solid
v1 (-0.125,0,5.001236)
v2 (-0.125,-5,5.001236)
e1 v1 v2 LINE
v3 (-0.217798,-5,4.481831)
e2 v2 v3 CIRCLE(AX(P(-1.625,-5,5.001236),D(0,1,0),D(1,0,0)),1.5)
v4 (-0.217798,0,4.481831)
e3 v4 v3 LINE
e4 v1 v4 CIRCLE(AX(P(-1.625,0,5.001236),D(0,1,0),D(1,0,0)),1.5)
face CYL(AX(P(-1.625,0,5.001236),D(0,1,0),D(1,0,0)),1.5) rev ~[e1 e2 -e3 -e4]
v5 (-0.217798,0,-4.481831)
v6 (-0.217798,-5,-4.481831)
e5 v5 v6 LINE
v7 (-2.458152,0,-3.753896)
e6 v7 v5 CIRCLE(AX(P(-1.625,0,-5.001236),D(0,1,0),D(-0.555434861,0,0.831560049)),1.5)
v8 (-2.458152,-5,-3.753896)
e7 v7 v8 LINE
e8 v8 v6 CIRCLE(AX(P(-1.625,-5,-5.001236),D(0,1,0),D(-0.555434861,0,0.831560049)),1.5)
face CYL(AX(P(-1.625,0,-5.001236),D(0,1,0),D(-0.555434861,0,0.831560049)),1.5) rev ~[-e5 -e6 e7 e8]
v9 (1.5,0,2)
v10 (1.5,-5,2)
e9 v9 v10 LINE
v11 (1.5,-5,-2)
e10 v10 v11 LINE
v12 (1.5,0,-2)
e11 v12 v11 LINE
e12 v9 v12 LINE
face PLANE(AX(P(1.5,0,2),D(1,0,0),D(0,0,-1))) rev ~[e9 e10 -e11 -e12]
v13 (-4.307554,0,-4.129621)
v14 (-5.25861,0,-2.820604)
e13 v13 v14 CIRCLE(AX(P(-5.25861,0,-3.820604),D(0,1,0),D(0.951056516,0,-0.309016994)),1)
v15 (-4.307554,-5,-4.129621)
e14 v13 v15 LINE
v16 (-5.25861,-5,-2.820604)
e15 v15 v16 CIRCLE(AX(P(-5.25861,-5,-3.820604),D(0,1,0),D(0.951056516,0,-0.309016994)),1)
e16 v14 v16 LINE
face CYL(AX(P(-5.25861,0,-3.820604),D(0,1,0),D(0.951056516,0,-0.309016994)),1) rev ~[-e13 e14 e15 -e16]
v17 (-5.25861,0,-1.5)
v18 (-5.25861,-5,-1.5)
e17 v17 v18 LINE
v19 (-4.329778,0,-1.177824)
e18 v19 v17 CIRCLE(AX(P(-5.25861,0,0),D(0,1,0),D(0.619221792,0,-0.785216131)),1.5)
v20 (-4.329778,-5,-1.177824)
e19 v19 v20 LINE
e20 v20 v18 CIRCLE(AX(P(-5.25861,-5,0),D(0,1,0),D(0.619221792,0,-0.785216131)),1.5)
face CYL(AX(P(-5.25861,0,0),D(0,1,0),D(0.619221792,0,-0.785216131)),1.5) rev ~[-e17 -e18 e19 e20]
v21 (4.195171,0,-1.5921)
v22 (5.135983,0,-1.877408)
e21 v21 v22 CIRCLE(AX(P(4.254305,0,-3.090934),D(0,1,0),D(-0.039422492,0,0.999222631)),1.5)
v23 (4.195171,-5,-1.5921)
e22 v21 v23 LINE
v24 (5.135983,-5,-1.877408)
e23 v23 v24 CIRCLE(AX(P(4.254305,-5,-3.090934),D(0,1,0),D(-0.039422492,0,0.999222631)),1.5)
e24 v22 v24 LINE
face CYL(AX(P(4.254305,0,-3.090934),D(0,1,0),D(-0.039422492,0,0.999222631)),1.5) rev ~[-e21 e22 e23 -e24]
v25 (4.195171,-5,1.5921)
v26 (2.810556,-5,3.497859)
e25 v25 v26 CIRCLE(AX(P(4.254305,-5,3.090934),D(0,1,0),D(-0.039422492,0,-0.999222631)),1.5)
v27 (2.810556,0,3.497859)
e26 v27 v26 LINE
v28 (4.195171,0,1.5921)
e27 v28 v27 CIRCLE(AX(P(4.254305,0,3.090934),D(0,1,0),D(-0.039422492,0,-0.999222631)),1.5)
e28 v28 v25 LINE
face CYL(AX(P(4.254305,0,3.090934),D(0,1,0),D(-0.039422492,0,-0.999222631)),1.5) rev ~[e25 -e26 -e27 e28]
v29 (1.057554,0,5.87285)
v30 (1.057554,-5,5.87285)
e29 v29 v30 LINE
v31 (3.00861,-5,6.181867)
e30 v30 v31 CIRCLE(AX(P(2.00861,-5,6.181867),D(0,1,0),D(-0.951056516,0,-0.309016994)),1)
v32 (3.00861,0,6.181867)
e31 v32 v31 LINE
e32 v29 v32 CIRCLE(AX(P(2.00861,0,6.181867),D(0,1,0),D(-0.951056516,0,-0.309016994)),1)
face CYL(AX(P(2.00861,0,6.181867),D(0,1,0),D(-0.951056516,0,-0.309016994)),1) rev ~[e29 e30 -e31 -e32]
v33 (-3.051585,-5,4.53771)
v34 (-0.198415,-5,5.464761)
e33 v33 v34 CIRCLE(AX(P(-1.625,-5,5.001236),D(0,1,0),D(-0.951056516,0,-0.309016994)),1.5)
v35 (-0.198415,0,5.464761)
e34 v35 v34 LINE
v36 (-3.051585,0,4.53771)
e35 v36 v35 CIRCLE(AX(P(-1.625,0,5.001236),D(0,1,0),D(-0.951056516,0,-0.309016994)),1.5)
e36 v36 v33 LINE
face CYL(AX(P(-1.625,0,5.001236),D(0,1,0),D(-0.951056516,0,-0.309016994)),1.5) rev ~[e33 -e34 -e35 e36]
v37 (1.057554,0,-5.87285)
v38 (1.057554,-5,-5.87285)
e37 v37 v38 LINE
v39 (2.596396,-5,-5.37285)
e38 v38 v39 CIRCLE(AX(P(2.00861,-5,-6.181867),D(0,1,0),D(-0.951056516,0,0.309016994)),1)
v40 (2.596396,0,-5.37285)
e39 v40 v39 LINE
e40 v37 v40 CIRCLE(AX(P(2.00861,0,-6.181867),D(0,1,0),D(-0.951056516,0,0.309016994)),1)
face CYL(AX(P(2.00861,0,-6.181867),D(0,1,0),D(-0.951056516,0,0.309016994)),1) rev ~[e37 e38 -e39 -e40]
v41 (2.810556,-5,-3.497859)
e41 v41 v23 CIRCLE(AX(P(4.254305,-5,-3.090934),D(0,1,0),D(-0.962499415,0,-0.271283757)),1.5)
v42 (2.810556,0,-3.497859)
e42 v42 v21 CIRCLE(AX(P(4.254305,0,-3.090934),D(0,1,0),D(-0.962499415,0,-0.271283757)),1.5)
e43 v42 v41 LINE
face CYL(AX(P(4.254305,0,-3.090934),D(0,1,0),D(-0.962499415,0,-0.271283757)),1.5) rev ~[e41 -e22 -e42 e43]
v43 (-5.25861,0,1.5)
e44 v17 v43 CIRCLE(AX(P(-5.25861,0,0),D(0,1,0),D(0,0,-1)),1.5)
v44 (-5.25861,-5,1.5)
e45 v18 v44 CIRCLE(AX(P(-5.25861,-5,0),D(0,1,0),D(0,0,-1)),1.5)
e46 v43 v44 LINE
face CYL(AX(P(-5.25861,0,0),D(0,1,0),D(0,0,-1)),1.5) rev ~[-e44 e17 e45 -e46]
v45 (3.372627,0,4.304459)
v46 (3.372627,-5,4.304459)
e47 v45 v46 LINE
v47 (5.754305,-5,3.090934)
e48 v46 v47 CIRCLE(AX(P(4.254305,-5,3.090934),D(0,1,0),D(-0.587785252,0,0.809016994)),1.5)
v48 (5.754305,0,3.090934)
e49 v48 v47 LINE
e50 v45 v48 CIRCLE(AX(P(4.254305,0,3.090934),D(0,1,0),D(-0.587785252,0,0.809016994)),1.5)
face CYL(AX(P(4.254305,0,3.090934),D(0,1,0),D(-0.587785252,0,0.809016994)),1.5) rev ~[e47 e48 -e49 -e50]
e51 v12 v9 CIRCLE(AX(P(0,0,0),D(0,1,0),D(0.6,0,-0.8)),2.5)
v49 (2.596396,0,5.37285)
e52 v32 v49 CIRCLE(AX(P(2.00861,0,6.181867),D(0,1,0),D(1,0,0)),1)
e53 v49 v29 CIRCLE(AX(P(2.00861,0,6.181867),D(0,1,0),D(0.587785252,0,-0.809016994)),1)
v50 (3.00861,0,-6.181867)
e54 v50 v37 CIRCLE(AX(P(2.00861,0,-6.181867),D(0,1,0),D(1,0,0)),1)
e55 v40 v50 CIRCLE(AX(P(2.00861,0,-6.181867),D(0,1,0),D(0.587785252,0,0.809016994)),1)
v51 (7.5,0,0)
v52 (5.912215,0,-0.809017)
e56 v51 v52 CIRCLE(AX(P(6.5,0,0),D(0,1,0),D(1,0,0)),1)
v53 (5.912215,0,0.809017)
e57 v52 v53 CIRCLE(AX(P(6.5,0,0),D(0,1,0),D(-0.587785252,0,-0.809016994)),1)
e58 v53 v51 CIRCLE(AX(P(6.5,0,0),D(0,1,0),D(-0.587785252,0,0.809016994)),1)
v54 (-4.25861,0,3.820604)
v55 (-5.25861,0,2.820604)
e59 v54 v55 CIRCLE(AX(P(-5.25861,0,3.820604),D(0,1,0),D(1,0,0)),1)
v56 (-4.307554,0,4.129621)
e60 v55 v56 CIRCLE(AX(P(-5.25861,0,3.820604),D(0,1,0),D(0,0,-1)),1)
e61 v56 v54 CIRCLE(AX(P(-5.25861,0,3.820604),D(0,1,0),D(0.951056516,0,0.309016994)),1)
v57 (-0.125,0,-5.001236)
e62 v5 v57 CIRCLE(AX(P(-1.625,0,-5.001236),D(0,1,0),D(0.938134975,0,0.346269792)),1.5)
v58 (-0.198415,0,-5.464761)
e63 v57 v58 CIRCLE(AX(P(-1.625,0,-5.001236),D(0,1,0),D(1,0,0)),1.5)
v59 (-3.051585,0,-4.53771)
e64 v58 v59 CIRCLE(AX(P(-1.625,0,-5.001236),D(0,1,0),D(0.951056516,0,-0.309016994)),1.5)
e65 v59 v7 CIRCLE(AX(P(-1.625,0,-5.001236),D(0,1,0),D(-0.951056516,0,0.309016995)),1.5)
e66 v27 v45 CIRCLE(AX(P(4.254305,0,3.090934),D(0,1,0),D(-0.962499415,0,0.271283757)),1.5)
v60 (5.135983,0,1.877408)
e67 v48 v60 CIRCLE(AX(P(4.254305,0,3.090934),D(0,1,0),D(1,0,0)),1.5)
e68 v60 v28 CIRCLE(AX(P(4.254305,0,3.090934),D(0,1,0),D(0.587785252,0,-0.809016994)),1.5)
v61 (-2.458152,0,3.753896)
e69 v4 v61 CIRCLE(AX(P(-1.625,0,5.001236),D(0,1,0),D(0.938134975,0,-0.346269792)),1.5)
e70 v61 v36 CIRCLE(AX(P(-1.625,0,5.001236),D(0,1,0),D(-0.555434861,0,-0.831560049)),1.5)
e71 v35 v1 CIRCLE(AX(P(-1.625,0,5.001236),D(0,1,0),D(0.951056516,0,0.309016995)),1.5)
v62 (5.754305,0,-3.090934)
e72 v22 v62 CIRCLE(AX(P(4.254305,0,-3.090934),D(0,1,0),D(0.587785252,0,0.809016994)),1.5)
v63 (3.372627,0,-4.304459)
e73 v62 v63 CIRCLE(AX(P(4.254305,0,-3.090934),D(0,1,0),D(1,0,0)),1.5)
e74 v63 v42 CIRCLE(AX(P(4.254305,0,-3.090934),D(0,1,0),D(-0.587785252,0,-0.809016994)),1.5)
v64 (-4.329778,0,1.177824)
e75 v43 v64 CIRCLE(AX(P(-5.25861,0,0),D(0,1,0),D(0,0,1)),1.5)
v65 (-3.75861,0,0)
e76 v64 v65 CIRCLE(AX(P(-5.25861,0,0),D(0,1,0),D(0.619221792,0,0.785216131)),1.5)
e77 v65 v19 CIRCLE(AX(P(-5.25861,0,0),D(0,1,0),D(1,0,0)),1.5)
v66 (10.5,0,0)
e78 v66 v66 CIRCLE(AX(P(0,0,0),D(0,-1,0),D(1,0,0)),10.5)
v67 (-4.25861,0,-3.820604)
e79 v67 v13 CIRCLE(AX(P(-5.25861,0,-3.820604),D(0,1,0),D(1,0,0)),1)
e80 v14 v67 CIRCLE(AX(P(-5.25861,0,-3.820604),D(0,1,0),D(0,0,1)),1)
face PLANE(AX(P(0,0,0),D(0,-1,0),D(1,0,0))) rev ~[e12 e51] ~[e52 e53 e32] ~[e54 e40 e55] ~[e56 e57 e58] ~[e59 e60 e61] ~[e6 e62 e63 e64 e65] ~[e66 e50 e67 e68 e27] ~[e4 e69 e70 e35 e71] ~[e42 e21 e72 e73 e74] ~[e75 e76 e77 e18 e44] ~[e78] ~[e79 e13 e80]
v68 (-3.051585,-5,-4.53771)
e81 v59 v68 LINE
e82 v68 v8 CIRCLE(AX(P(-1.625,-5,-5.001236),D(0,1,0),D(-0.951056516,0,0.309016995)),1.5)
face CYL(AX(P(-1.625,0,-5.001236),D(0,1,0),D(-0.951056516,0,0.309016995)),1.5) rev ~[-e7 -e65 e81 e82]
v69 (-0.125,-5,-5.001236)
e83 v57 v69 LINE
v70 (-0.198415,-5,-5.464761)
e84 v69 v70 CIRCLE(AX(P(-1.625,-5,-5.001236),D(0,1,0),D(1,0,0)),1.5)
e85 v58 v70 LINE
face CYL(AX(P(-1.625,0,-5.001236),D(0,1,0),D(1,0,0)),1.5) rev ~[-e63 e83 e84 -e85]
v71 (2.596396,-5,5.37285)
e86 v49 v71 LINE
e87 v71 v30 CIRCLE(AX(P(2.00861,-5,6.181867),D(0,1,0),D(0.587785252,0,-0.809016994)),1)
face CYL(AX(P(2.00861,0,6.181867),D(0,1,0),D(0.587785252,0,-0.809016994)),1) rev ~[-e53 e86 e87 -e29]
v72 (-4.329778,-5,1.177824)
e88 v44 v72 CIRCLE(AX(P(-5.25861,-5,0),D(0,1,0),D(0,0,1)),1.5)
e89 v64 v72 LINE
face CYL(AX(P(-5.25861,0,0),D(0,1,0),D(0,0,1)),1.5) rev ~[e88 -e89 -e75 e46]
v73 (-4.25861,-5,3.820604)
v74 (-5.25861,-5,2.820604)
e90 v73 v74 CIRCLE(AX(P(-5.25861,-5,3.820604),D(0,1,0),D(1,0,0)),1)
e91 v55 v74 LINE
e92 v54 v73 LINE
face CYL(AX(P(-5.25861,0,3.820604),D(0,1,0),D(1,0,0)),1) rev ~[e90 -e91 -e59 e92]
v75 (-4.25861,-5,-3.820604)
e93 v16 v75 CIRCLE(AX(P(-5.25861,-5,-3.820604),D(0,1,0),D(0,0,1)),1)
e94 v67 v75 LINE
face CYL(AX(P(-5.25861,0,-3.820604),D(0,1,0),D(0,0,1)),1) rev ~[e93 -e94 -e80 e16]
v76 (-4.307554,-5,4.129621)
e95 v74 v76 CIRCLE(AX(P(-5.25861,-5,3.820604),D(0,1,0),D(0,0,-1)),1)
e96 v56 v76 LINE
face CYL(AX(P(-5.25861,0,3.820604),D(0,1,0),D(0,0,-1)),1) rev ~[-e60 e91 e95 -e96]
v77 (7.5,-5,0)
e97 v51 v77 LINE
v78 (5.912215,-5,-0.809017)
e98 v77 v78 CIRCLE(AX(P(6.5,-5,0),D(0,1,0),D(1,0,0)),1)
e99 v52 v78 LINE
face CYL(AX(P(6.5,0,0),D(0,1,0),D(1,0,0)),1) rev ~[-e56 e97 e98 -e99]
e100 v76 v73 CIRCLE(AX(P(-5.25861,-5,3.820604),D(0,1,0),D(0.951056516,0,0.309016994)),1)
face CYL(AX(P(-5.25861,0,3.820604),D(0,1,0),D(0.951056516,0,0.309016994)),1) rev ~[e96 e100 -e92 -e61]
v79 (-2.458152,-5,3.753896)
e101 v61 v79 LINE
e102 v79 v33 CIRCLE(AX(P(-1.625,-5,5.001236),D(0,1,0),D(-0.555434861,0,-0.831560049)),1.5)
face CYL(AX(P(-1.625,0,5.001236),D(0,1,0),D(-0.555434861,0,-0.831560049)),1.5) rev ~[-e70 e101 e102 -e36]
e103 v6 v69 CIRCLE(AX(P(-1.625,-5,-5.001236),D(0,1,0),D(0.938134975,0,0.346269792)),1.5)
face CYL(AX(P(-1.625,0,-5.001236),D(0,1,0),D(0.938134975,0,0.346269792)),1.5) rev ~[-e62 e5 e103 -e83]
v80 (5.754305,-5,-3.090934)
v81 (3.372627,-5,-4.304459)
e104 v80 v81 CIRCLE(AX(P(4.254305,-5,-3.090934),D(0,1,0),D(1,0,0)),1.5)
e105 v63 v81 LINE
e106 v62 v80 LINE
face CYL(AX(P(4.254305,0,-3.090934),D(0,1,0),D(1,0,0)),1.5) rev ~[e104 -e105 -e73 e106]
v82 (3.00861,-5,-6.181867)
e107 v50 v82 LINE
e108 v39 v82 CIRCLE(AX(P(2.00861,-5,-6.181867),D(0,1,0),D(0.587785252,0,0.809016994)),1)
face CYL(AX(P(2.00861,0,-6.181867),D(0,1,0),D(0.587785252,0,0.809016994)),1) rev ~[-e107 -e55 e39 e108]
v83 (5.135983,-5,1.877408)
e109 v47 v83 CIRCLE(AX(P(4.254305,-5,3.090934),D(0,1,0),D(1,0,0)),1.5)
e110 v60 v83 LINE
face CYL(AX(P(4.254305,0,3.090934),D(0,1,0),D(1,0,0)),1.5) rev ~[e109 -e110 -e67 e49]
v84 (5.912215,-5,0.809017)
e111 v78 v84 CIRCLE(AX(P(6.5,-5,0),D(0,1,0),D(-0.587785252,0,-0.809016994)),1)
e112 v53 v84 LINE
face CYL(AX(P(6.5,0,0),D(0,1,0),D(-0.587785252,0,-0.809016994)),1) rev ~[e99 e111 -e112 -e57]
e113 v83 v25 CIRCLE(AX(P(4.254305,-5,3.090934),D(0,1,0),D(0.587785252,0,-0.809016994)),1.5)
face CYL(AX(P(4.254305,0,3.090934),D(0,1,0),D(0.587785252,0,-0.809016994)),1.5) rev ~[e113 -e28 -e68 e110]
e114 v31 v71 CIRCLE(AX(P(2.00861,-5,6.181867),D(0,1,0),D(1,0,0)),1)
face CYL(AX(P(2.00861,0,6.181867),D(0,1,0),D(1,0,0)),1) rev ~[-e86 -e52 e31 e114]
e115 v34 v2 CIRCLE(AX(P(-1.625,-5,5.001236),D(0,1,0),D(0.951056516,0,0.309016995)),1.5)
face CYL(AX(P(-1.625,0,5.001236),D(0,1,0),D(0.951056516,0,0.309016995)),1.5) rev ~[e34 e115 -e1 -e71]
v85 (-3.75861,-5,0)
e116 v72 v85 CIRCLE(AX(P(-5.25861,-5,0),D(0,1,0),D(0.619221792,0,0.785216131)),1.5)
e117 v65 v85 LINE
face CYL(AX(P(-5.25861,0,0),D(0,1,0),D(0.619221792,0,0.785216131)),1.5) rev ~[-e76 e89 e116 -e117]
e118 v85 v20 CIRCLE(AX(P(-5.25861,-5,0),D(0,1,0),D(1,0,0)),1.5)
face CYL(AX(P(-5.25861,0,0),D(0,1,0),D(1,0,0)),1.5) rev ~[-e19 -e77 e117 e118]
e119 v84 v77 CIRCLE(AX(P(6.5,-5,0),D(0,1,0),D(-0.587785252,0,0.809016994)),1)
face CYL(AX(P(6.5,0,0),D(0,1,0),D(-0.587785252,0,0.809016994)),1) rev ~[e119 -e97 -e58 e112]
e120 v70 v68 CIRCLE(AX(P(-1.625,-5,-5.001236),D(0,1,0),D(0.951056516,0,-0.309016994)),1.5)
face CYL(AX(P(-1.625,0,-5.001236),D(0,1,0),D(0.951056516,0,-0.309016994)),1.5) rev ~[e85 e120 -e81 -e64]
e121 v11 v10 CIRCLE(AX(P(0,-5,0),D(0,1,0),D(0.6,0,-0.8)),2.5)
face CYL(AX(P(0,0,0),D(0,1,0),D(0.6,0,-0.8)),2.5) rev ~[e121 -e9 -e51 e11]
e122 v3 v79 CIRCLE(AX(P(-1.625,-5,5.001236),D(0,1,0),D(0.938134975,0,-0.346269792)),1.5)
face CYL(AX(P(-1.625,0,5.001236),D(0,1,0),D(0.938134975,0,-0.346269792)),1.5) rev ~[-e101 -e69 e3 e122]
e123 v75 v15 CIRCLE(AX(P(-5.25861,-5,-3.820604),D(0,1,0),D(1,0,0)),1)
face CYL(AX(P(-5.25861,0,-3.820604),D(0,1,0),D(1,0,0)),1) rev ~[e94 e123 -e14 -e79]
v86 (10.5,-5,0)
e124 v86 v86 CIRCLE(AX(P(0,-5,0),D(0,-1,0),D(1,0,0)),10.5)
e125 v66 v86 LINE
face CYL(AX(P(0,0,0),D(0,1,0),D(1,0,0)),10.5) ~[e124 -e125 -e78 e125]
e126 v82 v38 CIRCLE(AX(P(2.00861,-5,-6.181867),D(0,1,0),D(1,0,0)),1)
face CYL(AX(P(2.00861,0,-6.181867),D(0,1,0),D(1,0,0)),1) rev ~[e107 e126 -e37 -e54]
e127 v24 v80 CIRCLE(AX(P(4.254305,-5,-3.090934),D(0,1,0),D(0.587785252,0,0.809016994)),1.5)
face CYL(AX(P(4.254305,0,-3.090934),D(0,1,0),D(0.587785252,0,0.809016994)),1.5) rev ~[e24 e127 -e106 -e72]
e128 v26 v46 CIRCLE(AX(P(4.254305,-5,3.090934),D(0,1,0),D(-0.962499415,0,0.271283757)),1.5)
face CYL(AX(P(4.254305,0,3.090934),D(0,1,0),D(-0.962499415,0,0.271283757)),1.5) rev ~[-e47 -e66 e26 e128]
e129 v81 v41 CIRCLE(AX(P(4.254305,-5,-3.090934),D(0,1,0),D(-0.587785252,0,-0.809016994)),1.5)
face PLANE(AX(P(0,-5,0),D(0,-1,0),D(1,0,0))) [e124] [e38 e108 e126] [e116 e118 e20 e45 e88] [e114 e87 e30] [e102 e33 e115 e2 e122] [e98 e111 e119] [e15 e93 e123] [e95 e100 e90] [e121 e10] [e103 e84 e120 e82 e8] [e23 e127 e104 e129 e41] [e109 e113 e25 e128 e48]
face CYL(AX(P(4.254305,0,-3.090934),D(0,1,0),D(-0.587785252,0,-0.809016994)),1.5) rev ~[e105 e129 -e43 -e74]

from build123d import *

# Parameters (mm, degrees)
F0_R     = 10.5
F1_DEPTH = 5


# Not quite as in the source:
# - a feature names something its author has since deleted; it is built from what else it names


with BuildPart() as f1:
    # F0 (on Front) → F1 (new body)
    with BuildSketch(Plane.XZ):
        Circle(F0_R)
        with BuildLine():
            Line((-6.1874431518, -2.6427799437), (-5.2586104634, -1.91030207))
            Line((-5.2586104634, -1.91030207), (-5.2586104634, -1.5))
            ThreePointArc((-5.2586104634, -1.5), (-6.7586104634, 0), (-5.2586104634, 1.5))
            Line((-5.2586104634, 1.5), (-5.2586104634, 1.91030207))
            Line((-5.2586104634, 1.91030207), (-6.1874431518, 2.6427799437))
            ThreePointArc((-6.1874431518, 2.6427799437), (-6.472135955, 4.7022820183), (-4.4254581722, 5.0679442137))
            Line((-4.4254581722, 5.0679442137), (-3.4418052317, 4.4109199439))
            Line((-3.4418052317, 4.4109199439), (-3.0515847744, 4.5377102563))
            ThreePointArc((-3.0515847744, 4.5377102563), (-2.0885254916, 6.4278205224), (-0.1984152256, 5.4647612395))
            Line((-0.1984152256, 5.4647612395), (0.1918052317, 5.5915515519))
            Line((0.1918052317, 5.5915515519), (0.601408001, 6.7012720437))
            ThreePointArc((0.601408001, 6.7012720437), (2.2724250824, 7.6584857382), (3.5086104634, 6.1818673559))
            ThreePointArc((3.5086104634, 6.1818673559), (3.4944811986, 5.976469794), (3.4523595855, 5.7749417209))
            Line((3.4523595855, 5.7749417209), (3.1314578476, 4.6364005169))
            Line((3.1314578476, 4.6364005169), (3.3726273533, 4.3044591695))
            ThreePointArc((3.3726273533, 4.3044591695), (4.9352909813, 4.4274434642), (5.7543052317, 3.090933678))
            ThreePointArc((5.7543052317, 3.090933678), (5.590815018, 2.4099479283), (5.1359831102, 1.8774081864))
            Line((5.1359831102, 1.8774081864), (5.3771526159, 1.545466839))
            Line((5.3771526159, 1.545466839), (6.5591337375, 1.4988339471))
            ThreePointArc((6.5591337375, 1.4988339471), (7.5813650184, 1.0395430231), (8, 0))
            ThreePointArc((8, 0), (7.5813650184, -1.0395430231), (6.5591337375, -1.4988339471))
            Line((6.5591337375, -1.4988339471), (5.3771526159, -1.545466839))
            Line((5.3771526159, -1.545466839), (5.1359831102, -1.8774081864))
            ThreePointArc((5.1359831102, -1.8774081864), (5.590815018, -2.4099479283), (5.7543052317, -3.090933678))
            ThreePointArc((5.7543052317, -3.090933678), (4.9352909813, -4.4274434642), (3.3726273533, -4.3044591695))
            Line((3.3726273533, -4.3044591695), (3.1314578476, -4.6364005169))
            Line((3.1314578476, -4.6364005169), (3.4523595855, -5.7749417209))
            ThreePointArc((3.4523595855, -5.7749417209), (3.4944811986, -5.976469794), (3.5086104634, -6.1818673559))
            ThreePointArc((3.5086104634, -6.1818673559), (2.2724250824, -7.6584857382), (0.601408001, -6.7012720437))
            Line((0.601408001, -6.7012720437), (0.1918052317, -5.5915515519))
            Line((0.1918052317, -5.5915515519), (-0.1984152256, -5.4647612395))
            ThreePointArc((-0.1984152256, -5.4647612395), (-2.0885254916, -6.4278205224), (-3.0515847744, -4.5377102563))
            Line((-3.0515847744, -4.5377102563), (-3.4418052317, -4.4109199439))
            Line((-3.4418052317, -4.4109199439), (-4.4254581722, -5.0679442137))
            ThreePointArc((-4.4254581722, -5.0679442137), (-6.472135955, -4.7022820183), (-6.1874431518, -2.6427799437))
        make_face(mode=Mode.SUBTRACT)
        with BuildLine():
            Line((-5.2586104634, -1.91030207), (-5.2586104634, -2.3206041399))
            ThreePointArc((-5.2586104634, -2.3206041399), (-4.1979502917, -2.7599439681), (-3.7586104634, -3.8206041399))
            ThreePointArc((-3.7586104634, -3.8206041399), (-3.7770779525, -4.0552558375), (-3.832025689, -4.2841296315))
            Line((-3.832025689, -4.2841296315), (-3.4418052317, -4.4109199439))
            Line((-3.4418052317, -4.4109199439), (-2.4581522912, -3.7538956741))
            ThreePointArc((-2.4581522912, -3.7538956741), (-1.1614745084, -3.5746509735), (-0.2177975376, -4.4818310601))
            Line((-0.2177975376, -4.4818310601), (0.1918052317, -5.5915515519))
            Line((0.1918052317, -5.5915515519), (0.582025689, -5.7183418644))
            ThreePointArc((0.582025689, -5.7183418644), (1.5450849719, -4.7552825815), (2.8902883419, -4.9683418644))
            Line((2.8902883419, -4.9683418644), (3.1314578476, -4.6364005169))
            Line((3.1314578476, -4.6364005169), (2.8105561096, -3.497859313))
            ThreePointArc((2.8105561096, -3.497859313), (3.0407797402, -2.2092557995), (4.1951714942, -1.5920997308))
            Line((4.1951714942, -1.5920997308), (5.3771526159, -1.545466839))
            Line((5.3771526159, -1.545466839), (5.6183221216, -1.2135254916))
            ThreePointArc((5.6183221216, -1.2135254916), (5, 0), (5.6183221216, 1.2135254916))
            Line((5.6183221216, 1.2135254916), (5.3771526159, 1.545466839))
            Line((5.3771526159, 1.545466839), (4.1951714942, 1.5920997308))
            ThreePointArc((4.1951714942, 1.5920997308), (3.0407797402, 2.2092557995), (2.8105561096, 3.497859313))
            Line((2.8105561096, 3.497859313), (3.1314578476, 4.6364005169))
            Line((3.1314578476, 4.6364005169), (2.8902883419, 4.9683418644))
            ThreePointArc((2.8902883419, 4.9683418644), (1.5450849719, 4.7552825815), (0.582025689, 5.7183418644))
            Line((0.582025689, 5.7183418644), (0.1918052317, 5.5915515519))
            Line((0.1918052317, 5.5915515519), (-0.2177975376, 4.4818310601))
            ThreePointArc((-0.2177975376, 4.4818310601), (-1.1614745084, 3.5746509735), (-2.4581522912, 3.7538956741))
            Line((-2.4581522912, 3.7538956741), (-3.4418052317, 4.4109199439))
            Line((-3.4418052317, 4.4109199439), (-3.832025689, 4.2841296315))
            ThreePointArc((-3.832025689, 4.2841296315), (-3.7770779525, 4.0552558375), (-3.7586104634, 3.8206041399))
            ThreePointArc((-3.7586104634, 3.8206041399), (-4.1979502917, 2.7599439681), (-5.2586104634, 2.3206041399))
            Line((-5.2586104634, 2.3206041399), (-5.2586104634, 1.91030207))
            Line((-5.2586104634, 1.91030207), (-4.3297777751, 1.1778241962))
            ThreePointArc((-4.3297777751, 1.1778241962), (-3.9089347556, 0.6545039983), (-3.7586104634, 0))
            ThreePointArc((-3.7586104634, 0), (-3.9089347556, -0.6545039983), (-4.3297777751, -1.1778241962))
            Line((-4.3297777751, -1.1778241962), (-5.2586104634, -1.91030207))
        make_face()
        with BuildLine():
            ThreePointArc((1.5, 2), (2.2360679775, 1.1180339887), (2.5, 0))
            ThreePointArc((2.5, 0), (2.2360679775, -1.1180339887), (1.5, -2))
            ThreePointArc((1.5, -2), (-2.5, 0), (1.5, 2))
        make_face(mode=Mode.SUBTRACT)
        with BuildLine():
            ThreePointArc((1.5, -2), (2.2360679775, -1.1180339887), (2.5, 0))
            ThreePointArc((2.5, 0), (2.2360679775, 1.1180339887), (1.5, 2))
            Line((1.5, 2), (1.5, -2))
        make_face()
        with BuildLine():
            ThreePointArc((-4.3075539471, -4.1296211343), (-6.0676274578, -4.4083893922), (-5.2586104634, -2.8206041399))
            Line((-5.2586104634, -2.8206041399), (-5.2586104634, -2.3206041399))
            ThreePointArc((-5.2586104634, -2.3206041399), (-5.7501710933, -2.403435079), (-6.1874431518, -2.6427799437))
            ThreePointArc((-6.1874431518, -2.6427799437), (-6.472135955, -4.7022820183), (-4.4254581722, -5.0679442137))
            ThreePointArc((-4.4254581722, -5.0679442137), (-4.0627031818, -4.7260354038), (-3.832025689, -4.2841296315))
            Line((-3.832025689, -4.2841296315), (-4.3075539471, -4.1296211343))
        make_face()
        with BuildLine():
            ThreePointArc((-6.1874431518, 2.6427799437), (-5.7501710933, 2.403435079), (-5.2586104634, 2.3206041399))
            Line((-5.2586104634, 2.3206041399), (-5.2586104634, 2.8206041399))
            ThreePointArc((-5.2586104634, 2.8206041399), (-6.0676274578, 4.4083893922), (-4.3075539471, 4.1296211343))
            Line((-4.3075539471, 4.1296211343), (-3.832025689, 4.2841296315))
            ThreePointArc((-3.832025689, 4.2841296315), (-4.0627031818, 4.7260354038), (-4.4254581722, 5.0679442137))
            ThreePointArc((-4.4254581722, 5.0679442137), (-6.472135955, 4.7022820183), (-6.1874431518, 2.6427799437))
        make_face()
        with BuildLine():
            Line((1.0575539471, -5.8728503615), (0.582025689, -5.7183418644))
            ThreePointArc((0.582025689, -5.7183418644), (0.508902005, -6.2114399724), (0.601408001, -6.7012720437))
            ThreePointArc((0.601408001, -6.7012720437), (2.2724250824, -7.6584857382), (3.5086104634, -6.1818673559))
            ThreePointArc((3.5086104634, -6.1818673559), (3.4944811986, -5.976469794), (3.4523595855, -5.7749417209))
            ThreePointArc((3.4523595855, -5.7749417209), (3.2392824408, -5.3242855906), (2.8902883419, -4.9683418644))
            Line((2.8902883419, -4.9683418644), (2.5963957157, -5.3728503615))
            ThreePointArc((2.5963957157, -5.3728503615), (2.8996169876, -5.7278768562), (3.0086104634, -6.1818673559))
            ThreePointArc((3.0086104634, -6.1818673559), (1.8521759984, -7.1695556965), (1.0575539471, -5.8728503615))
        make_face()
        with BuildLine():
            ThreePointArc((0.601408001, 6.7012720437), (0.508902005, 6.2114399724), (0.582025689, 5.7183418644))
            Line((0.582025689, 5.7183418644), (1.0575539471, 5.8728503615))
            ThreePointArc((1.0575539471, 5.8728503615), (1.8521759984, 7.1695556965), (3.0086104634, 6.1818673559))
            ThreePointArc((3.0086104634, 6.1818673559), (2.8996169876, 5.7278768562), (2.5963957157, 5.3728503615))
            Line((2.5963957157, 5.3728503615), (2.8902883419, 4.9683418644))
            ThreePointArc((2.8902883419, 4.9683418644), (3.2392824408, 5.3242855906), (3.4523595855, 5.7749417209))
            ThreePointArc((3.4523595855, 5.7749417209), (3.4944811986, 5.976469794), (3.5086104634, 6.1818673559))
            ThreePointArc((3.5086104634, 6.1818673559), (2.2724250824, 7.6584857382), (0.601408001, 6.7012720437))
        make_face()
        with BuildLine():
            Line((5.9122147477, -0.8090169944), (5.6183221216, -1.2135254916))
            ThreePointArc((5.6183221216, -1.2135254916), (6.0646898294, -1.435445943), (6.5591337375, -1.4988339471))
            ThreePointArc((6.5591337375, -1.4988339471), (7.5813650184, -1.0395430231), (8, 0))
            ThreePointArc((8, 0), (7.5813650184, 1.0395430231), (6.5591337375, 1.4988339471))
            ThreePointArc((6.5591337375, 1.4988339471), (6.0646898294, 1.435445943), (5.6183221216, 1.2135254916))
            Line((5.6183221216, 1.2135254916), (5.9122147477, 0.8090169944))
            ThreePointArc((5.9122147477, 0.8090169944), (6.9539904997, 0.8910065242), (7.5, 0))
            ThreePointArc((7.5, 0), (6.9539904997, -0.8910065242), (5.9122147477, -0.8090169944))
        make_face()
        with BuildLine():
            Line((-5.2586104634, -2.3206041399), (-5.2586104634, -2.8206041399))
            ThreePointArc((-5.2586104634, -2.8206041399), (-4.5515036823, -3.1134973587), (-4.2586104634, -3.8206041399))
            ThreePointArc((-4.2586104634, -3.8206041399), (-4.2709221228, -3.9770386049), (-4.3075539471, -4.1296211343))
            Line((-4.3075539471, -4.1296211343), (-3.832025689, -4.2841296315))
            ThreePointArc((-3.832025689, -4.2841296315), (-3.7770779525, -4.0552558375), (-3.7586104634, -3.8206041399))
            ThreePointArc((-3.7586104634, -3.8206041399), (-4.1979502917, -2.7599439681), (-5.2586104634, -2.3206041399))
        make_face()
        with BuildLine():
            Line((-5.2586104634, 2.8206041399), (-5.2586104634, 2.3206041399))
            ThreePointArc((-5.2586104634, 2.3206041399), (-4.1979502917, 2.7599439681), (-3.7586104634, 3.8206041399))
            ThreePointArc((-3.7586104634, 3.8206041399), (-3.7770779525, 4.0552558375), (-3.832025689, 4.2841296315))
            Line((-3.832025689, 4.2841296315), (-4.3075539471, 4.1296211343))
            ThreePointArc((-4.3075539471, 4.1296211343), (-4.2709221228, 3.9770386049), (-4.2586104634, 3.8206041399))
            ThreePointArc((-4.2586104634, 3.8206041399), (-4.5515036823, 3.1134973587), (-5.2586104634, 2.8206041399))
        make_face()
        with BuildLine():
            ThreePointArc((2.8902883419, -4.9683418644), (1.5450849719, -4.7552825815), (0.582025689, -5.7183418644))
            Line((0.582025689, -5.7183418644), (1.0575539471, -5.8728503615))
            ThreePointArc((1.0575539471, -5.8728503615), (1.6995934691, -5.2308108396), (2.5963957157, -5.3728503615))
            Line((2.5963957157, -5.3728503615), (2.8902883419, -4.9683418644))
        make_face()
        with BuildLine():
            Line((1.0575539471, 5.8728503615), (0.582025689, 5.7183418644))
            ThreePointArc((0.582025689, 5.7183418644), (1.5450849719, 4.7552825815), (2.8902883419, 4.9683418644))
            Line((2.8902883419, 4.9683418644), (2.5963957157, 5.3728503615))
            ThreePointArc((2.5963957157, 5.3728503615), (1.6995934691, 5.2308108396), (1.0575539471, 5.8728503615))
        make_face()
        with BuildLine():
            ThreePointArc((5.6183221216, 1.2135254916), (5, 0), (5.6183221216, -1.2135254916))
            Line((5.6183221216, -1.2135254916), (5.9122147477, -0.8090169944))
            ThreePointArc((5.9122147477, -0.8090169944), (5.5, 0), (5.9122147477, 0.8090169944))
            Line((5.9122147477, 0.8090169944), (5.6183221216, 1.2135254916))
        make_face()
        with BuildLine():
            ThreePointArc((-6.1874431518, -2.6427799437), (-5.7501710933, -2.403435079), (-5.2586104634, -2.3206041399))
            Line((-5.2586104634, -2.3206041399), (-5.2586104634, -1.91030207))
            Line((-5.2586104634, -1.91030207), (-6.1874431518, -2.6427799437))
        make_face()
        with BuildLine():
            Line((-3.4418052317, -4.4109199439), (-3.832025689, -4.2841296315))
            ThreePointArc((-3.832025689, -4.2841296315), (-4.0627031818, -4.7260354038), (-4.4254581722, -5.0679442137))
            Line((-4.4254581722, -5.0679442137), (-3.4418052317, -4.4109199439))
        make_face()
        with BuildLine():
            Line((-5.2586104634, -1.5), (-5.2586104634, -1.91030207))
            Line((-5.2586104634, -1.91030207), (-4.3297777751, -1.1778241962))
            ThreePointArc((-4.3297777751, -1.1778241962), (-4.7670498335, -1.4171690609), (-5.2586104634, -1.5))
        make_face()
        with BuildLine():
            Line((-2.4581522912, -3.7538956741), (-3.4418052317, -4.4109199439))
            Line((-3.4418052317, -4.4109199439), (-3.0515847744, -4.5377102563))
            ThreePointArc((-3.0515847744, -4.5377102563), (-2.8209072816, -4.095804484), (-2.4581522912, -3.7538956741))
        make_face()
        with BuildLine():
            Line((-5.2586104634, 1.91030207), (-5.2586104634, 1.5))
            ThreePointArc((-5.2586104634, 1.5), (-4.7670498335, 1.4171690609), (-4.3297777751, 1.1778241962))
            Line((-4.3297777751, 1.1778241962), (-5.2586104634, 1.91030207))
        make_face()
        with BuildLine():
            ThreePointArc((-0.125, -5.0012357479), (-0.1434674891, -5.2358874455), (-0.1984152256, -5.4647612395))
            Line((-0.1984152256, -5.4647612395), (0.1918052317, -5.5915515519))
            Line((0.1918052317, -5.5915515519), (-0.2177975376, -4.4818310601))
            ThreePointArc((-0.2177975376, -4.4818310601), (-0.1483816177, -4.737421129), (-0.125, -5.0012357479))
        make_face()
        with BuildLine():
            Line((-6.1874431518, 2.6427799437), (-5.2586104634, 1.91030207))
            Line((-5.2586104634, 1.91030207), (-5.2586104634, 2.3206041399))
            ThreePointArc((-5.2586104634, 2.3206041399), (-5.7501710933, 2.403435079), (-6.1874431518, 2.6427799437))
        make_face()
        with BuildLine():
            Line((0.582025689, -5.7183418644), (0.1918052317, -5.5915515519))
            Line((0.1918052317, -5.5915515519), (0.601408001, -6.7012720437))
            ThreePointArc((0.601408001, -6.7012720437), (0.508902005, -6.2114399724), (0.582025689, -5.7183418644))
        make_face()
        with BuildLine():
            Line((-3.4418052317, 4.4109199439), (-4.4254581722, 5.0679442137))
            ThreePointArc((-4.4254581722, 5.0679442137), (-4.0627031818, 4.7260354038), (-3.832025689, 4.2841296315))
            Line((-3.832025689, 4.2841296315), (-3.4418052317, 4.4109199439))
        make_face()
        with BuildLine():
            Line((3.1314578476, -4.6364005169), (2.8902883419, -4.9683418644))
            ThreePointArc((2.8902883419, -4.9683418644), (3.2392824408, -5.3242855906), (3.4523595855, -5.7749417209))
            Line((3.4523595855, -5.7749417209), (3.1314578476, -4.6364005169))
        make_face()
        with BuildLine():
            Line((-3.0515847744, 4.5377102563), (-3.4418052317, 4.4109199439))
            Line((-3.4418052317, 4.4109199439), (-2.4581522912, 3.7538956741))
            ThreePointArc((-2.4581522912, 3.7538956741), (-2.8209072816, 4.095804484), (-3.0515847744, 4.5377102563))
        make_face()
        with BuildLine():
            Line((2.8105561096, -3.497859313), (3.1314578476, -4.6364005169))
            Line((3.1314578476, -4.6364005169), (3.3726273533, -4.3044591695))
            ThreePointArc((3.3726273533, -4.3044591695), (3.0236332544, -3.9485154433), (2.8105561096, -3.497859313))
        make_face()
        with BuildLine():
            Line((0.1918052317, 5.5915515519), (-0.1984152256, 5.4647612395))
            ThreePointArc((-0.1984152256, 5.4647612395), (-0.1434674891, 5.2358874455), (-0.125, 5.0012357479))
            ThreePointArc((-0.125, 5.0012357479), (-0.1483816177, 4.737421129), (-0.2177975376, 4.4818310601))
            Line((-0.2177975376, 4.4818310601), (0.1918052317, 5.5915515519))
        make_face()
        with BuildLine():
            ThreePointArc((4.1951714942, -1.5920997308), (4.6896154024, -1.6554877349), (5.1359831102, -1.8774081864))
            Line((5.1359831102, -1.8774081864), (5.3771526159, -1.545466839))
            Line((5.3771526159, -1.545466839), (4.1951714942, -1.5920997308))
        make_face()
        with BuildLine():
            Line((0.601408001, 6.7012720437), (0.1918052317, 5.5915515519))
            Line((0.1918052317, 5.5915515519), (0.582025689, 5.7183418644))
            ThreePointArc((0.582025689, 5.7183418644), (0.508902005, 6.2114399724), (0.601408001, 6.7012720437))
        make_face()
        with BuildLine():
            Line((5.6183221216, -1.2135254916), (5.3771526159, -1.545466839))
            Line((5.3771526159, -1.545466839), (6.5591337375, -1.4988339471))
            ThreePointArc((6.5591337375, -1.4988339471), (6.0646898294, -1.435445943), (5.6183221216, -1.2135254916))
        make_face()
        with BuildLine():
            ThreePointArc((3.4523595855, 5.7749417209), (3.2392824408, 5.3242855906), (2.8902883419, 4.9683418644))
            Line((2.8902883419, 4.9683418644), (3.1314578476, 4.6364005169))
            Line((3.1314578476, 4.6364005169), (3.4523595855, 5.7749417209))
        make_face()
        with BuildLine():
            Line((5.3771526159, 1.545466839), (5.6183221216, 1.2135254916))
            ThreePointArc((5.6183221216, 1.2135254916), (6.0646898294, 1.435445943), (6.5591337375, 1.4988339471))
            Line((6.5591337375, 1.4988339471), (5.3771526159, 1.545466839))
        make_face()
        with BuildLine():
            Line((3.3726273533, 4.3044591695), (3.1314578476, 4.6364005169))
            Line((3.1314578476, 4.6364005169), (2.8105561096, 3.497859313))
            ThreePointArc((2.8105561096, 3.497859313), (3.0236332544, 3.9485154433), (3.3726273533, 4.3044591695))
        make_face()
        with BuildLine():
            Line((4.1951714942, 1.5920997308), (5.3771526159, 1.545466839))
            Line((5.3771526159, 1.545466839), (5.1359831102, 1.8774081864))
            ThreePointArc((5.1359831102, 1.8774081864), (4.6896154024, 1.6554877349), (4.1951714942, 1.5920997308))
        make_face()
    extrude(amount=F1_DEPTH)


solid = f1.part
